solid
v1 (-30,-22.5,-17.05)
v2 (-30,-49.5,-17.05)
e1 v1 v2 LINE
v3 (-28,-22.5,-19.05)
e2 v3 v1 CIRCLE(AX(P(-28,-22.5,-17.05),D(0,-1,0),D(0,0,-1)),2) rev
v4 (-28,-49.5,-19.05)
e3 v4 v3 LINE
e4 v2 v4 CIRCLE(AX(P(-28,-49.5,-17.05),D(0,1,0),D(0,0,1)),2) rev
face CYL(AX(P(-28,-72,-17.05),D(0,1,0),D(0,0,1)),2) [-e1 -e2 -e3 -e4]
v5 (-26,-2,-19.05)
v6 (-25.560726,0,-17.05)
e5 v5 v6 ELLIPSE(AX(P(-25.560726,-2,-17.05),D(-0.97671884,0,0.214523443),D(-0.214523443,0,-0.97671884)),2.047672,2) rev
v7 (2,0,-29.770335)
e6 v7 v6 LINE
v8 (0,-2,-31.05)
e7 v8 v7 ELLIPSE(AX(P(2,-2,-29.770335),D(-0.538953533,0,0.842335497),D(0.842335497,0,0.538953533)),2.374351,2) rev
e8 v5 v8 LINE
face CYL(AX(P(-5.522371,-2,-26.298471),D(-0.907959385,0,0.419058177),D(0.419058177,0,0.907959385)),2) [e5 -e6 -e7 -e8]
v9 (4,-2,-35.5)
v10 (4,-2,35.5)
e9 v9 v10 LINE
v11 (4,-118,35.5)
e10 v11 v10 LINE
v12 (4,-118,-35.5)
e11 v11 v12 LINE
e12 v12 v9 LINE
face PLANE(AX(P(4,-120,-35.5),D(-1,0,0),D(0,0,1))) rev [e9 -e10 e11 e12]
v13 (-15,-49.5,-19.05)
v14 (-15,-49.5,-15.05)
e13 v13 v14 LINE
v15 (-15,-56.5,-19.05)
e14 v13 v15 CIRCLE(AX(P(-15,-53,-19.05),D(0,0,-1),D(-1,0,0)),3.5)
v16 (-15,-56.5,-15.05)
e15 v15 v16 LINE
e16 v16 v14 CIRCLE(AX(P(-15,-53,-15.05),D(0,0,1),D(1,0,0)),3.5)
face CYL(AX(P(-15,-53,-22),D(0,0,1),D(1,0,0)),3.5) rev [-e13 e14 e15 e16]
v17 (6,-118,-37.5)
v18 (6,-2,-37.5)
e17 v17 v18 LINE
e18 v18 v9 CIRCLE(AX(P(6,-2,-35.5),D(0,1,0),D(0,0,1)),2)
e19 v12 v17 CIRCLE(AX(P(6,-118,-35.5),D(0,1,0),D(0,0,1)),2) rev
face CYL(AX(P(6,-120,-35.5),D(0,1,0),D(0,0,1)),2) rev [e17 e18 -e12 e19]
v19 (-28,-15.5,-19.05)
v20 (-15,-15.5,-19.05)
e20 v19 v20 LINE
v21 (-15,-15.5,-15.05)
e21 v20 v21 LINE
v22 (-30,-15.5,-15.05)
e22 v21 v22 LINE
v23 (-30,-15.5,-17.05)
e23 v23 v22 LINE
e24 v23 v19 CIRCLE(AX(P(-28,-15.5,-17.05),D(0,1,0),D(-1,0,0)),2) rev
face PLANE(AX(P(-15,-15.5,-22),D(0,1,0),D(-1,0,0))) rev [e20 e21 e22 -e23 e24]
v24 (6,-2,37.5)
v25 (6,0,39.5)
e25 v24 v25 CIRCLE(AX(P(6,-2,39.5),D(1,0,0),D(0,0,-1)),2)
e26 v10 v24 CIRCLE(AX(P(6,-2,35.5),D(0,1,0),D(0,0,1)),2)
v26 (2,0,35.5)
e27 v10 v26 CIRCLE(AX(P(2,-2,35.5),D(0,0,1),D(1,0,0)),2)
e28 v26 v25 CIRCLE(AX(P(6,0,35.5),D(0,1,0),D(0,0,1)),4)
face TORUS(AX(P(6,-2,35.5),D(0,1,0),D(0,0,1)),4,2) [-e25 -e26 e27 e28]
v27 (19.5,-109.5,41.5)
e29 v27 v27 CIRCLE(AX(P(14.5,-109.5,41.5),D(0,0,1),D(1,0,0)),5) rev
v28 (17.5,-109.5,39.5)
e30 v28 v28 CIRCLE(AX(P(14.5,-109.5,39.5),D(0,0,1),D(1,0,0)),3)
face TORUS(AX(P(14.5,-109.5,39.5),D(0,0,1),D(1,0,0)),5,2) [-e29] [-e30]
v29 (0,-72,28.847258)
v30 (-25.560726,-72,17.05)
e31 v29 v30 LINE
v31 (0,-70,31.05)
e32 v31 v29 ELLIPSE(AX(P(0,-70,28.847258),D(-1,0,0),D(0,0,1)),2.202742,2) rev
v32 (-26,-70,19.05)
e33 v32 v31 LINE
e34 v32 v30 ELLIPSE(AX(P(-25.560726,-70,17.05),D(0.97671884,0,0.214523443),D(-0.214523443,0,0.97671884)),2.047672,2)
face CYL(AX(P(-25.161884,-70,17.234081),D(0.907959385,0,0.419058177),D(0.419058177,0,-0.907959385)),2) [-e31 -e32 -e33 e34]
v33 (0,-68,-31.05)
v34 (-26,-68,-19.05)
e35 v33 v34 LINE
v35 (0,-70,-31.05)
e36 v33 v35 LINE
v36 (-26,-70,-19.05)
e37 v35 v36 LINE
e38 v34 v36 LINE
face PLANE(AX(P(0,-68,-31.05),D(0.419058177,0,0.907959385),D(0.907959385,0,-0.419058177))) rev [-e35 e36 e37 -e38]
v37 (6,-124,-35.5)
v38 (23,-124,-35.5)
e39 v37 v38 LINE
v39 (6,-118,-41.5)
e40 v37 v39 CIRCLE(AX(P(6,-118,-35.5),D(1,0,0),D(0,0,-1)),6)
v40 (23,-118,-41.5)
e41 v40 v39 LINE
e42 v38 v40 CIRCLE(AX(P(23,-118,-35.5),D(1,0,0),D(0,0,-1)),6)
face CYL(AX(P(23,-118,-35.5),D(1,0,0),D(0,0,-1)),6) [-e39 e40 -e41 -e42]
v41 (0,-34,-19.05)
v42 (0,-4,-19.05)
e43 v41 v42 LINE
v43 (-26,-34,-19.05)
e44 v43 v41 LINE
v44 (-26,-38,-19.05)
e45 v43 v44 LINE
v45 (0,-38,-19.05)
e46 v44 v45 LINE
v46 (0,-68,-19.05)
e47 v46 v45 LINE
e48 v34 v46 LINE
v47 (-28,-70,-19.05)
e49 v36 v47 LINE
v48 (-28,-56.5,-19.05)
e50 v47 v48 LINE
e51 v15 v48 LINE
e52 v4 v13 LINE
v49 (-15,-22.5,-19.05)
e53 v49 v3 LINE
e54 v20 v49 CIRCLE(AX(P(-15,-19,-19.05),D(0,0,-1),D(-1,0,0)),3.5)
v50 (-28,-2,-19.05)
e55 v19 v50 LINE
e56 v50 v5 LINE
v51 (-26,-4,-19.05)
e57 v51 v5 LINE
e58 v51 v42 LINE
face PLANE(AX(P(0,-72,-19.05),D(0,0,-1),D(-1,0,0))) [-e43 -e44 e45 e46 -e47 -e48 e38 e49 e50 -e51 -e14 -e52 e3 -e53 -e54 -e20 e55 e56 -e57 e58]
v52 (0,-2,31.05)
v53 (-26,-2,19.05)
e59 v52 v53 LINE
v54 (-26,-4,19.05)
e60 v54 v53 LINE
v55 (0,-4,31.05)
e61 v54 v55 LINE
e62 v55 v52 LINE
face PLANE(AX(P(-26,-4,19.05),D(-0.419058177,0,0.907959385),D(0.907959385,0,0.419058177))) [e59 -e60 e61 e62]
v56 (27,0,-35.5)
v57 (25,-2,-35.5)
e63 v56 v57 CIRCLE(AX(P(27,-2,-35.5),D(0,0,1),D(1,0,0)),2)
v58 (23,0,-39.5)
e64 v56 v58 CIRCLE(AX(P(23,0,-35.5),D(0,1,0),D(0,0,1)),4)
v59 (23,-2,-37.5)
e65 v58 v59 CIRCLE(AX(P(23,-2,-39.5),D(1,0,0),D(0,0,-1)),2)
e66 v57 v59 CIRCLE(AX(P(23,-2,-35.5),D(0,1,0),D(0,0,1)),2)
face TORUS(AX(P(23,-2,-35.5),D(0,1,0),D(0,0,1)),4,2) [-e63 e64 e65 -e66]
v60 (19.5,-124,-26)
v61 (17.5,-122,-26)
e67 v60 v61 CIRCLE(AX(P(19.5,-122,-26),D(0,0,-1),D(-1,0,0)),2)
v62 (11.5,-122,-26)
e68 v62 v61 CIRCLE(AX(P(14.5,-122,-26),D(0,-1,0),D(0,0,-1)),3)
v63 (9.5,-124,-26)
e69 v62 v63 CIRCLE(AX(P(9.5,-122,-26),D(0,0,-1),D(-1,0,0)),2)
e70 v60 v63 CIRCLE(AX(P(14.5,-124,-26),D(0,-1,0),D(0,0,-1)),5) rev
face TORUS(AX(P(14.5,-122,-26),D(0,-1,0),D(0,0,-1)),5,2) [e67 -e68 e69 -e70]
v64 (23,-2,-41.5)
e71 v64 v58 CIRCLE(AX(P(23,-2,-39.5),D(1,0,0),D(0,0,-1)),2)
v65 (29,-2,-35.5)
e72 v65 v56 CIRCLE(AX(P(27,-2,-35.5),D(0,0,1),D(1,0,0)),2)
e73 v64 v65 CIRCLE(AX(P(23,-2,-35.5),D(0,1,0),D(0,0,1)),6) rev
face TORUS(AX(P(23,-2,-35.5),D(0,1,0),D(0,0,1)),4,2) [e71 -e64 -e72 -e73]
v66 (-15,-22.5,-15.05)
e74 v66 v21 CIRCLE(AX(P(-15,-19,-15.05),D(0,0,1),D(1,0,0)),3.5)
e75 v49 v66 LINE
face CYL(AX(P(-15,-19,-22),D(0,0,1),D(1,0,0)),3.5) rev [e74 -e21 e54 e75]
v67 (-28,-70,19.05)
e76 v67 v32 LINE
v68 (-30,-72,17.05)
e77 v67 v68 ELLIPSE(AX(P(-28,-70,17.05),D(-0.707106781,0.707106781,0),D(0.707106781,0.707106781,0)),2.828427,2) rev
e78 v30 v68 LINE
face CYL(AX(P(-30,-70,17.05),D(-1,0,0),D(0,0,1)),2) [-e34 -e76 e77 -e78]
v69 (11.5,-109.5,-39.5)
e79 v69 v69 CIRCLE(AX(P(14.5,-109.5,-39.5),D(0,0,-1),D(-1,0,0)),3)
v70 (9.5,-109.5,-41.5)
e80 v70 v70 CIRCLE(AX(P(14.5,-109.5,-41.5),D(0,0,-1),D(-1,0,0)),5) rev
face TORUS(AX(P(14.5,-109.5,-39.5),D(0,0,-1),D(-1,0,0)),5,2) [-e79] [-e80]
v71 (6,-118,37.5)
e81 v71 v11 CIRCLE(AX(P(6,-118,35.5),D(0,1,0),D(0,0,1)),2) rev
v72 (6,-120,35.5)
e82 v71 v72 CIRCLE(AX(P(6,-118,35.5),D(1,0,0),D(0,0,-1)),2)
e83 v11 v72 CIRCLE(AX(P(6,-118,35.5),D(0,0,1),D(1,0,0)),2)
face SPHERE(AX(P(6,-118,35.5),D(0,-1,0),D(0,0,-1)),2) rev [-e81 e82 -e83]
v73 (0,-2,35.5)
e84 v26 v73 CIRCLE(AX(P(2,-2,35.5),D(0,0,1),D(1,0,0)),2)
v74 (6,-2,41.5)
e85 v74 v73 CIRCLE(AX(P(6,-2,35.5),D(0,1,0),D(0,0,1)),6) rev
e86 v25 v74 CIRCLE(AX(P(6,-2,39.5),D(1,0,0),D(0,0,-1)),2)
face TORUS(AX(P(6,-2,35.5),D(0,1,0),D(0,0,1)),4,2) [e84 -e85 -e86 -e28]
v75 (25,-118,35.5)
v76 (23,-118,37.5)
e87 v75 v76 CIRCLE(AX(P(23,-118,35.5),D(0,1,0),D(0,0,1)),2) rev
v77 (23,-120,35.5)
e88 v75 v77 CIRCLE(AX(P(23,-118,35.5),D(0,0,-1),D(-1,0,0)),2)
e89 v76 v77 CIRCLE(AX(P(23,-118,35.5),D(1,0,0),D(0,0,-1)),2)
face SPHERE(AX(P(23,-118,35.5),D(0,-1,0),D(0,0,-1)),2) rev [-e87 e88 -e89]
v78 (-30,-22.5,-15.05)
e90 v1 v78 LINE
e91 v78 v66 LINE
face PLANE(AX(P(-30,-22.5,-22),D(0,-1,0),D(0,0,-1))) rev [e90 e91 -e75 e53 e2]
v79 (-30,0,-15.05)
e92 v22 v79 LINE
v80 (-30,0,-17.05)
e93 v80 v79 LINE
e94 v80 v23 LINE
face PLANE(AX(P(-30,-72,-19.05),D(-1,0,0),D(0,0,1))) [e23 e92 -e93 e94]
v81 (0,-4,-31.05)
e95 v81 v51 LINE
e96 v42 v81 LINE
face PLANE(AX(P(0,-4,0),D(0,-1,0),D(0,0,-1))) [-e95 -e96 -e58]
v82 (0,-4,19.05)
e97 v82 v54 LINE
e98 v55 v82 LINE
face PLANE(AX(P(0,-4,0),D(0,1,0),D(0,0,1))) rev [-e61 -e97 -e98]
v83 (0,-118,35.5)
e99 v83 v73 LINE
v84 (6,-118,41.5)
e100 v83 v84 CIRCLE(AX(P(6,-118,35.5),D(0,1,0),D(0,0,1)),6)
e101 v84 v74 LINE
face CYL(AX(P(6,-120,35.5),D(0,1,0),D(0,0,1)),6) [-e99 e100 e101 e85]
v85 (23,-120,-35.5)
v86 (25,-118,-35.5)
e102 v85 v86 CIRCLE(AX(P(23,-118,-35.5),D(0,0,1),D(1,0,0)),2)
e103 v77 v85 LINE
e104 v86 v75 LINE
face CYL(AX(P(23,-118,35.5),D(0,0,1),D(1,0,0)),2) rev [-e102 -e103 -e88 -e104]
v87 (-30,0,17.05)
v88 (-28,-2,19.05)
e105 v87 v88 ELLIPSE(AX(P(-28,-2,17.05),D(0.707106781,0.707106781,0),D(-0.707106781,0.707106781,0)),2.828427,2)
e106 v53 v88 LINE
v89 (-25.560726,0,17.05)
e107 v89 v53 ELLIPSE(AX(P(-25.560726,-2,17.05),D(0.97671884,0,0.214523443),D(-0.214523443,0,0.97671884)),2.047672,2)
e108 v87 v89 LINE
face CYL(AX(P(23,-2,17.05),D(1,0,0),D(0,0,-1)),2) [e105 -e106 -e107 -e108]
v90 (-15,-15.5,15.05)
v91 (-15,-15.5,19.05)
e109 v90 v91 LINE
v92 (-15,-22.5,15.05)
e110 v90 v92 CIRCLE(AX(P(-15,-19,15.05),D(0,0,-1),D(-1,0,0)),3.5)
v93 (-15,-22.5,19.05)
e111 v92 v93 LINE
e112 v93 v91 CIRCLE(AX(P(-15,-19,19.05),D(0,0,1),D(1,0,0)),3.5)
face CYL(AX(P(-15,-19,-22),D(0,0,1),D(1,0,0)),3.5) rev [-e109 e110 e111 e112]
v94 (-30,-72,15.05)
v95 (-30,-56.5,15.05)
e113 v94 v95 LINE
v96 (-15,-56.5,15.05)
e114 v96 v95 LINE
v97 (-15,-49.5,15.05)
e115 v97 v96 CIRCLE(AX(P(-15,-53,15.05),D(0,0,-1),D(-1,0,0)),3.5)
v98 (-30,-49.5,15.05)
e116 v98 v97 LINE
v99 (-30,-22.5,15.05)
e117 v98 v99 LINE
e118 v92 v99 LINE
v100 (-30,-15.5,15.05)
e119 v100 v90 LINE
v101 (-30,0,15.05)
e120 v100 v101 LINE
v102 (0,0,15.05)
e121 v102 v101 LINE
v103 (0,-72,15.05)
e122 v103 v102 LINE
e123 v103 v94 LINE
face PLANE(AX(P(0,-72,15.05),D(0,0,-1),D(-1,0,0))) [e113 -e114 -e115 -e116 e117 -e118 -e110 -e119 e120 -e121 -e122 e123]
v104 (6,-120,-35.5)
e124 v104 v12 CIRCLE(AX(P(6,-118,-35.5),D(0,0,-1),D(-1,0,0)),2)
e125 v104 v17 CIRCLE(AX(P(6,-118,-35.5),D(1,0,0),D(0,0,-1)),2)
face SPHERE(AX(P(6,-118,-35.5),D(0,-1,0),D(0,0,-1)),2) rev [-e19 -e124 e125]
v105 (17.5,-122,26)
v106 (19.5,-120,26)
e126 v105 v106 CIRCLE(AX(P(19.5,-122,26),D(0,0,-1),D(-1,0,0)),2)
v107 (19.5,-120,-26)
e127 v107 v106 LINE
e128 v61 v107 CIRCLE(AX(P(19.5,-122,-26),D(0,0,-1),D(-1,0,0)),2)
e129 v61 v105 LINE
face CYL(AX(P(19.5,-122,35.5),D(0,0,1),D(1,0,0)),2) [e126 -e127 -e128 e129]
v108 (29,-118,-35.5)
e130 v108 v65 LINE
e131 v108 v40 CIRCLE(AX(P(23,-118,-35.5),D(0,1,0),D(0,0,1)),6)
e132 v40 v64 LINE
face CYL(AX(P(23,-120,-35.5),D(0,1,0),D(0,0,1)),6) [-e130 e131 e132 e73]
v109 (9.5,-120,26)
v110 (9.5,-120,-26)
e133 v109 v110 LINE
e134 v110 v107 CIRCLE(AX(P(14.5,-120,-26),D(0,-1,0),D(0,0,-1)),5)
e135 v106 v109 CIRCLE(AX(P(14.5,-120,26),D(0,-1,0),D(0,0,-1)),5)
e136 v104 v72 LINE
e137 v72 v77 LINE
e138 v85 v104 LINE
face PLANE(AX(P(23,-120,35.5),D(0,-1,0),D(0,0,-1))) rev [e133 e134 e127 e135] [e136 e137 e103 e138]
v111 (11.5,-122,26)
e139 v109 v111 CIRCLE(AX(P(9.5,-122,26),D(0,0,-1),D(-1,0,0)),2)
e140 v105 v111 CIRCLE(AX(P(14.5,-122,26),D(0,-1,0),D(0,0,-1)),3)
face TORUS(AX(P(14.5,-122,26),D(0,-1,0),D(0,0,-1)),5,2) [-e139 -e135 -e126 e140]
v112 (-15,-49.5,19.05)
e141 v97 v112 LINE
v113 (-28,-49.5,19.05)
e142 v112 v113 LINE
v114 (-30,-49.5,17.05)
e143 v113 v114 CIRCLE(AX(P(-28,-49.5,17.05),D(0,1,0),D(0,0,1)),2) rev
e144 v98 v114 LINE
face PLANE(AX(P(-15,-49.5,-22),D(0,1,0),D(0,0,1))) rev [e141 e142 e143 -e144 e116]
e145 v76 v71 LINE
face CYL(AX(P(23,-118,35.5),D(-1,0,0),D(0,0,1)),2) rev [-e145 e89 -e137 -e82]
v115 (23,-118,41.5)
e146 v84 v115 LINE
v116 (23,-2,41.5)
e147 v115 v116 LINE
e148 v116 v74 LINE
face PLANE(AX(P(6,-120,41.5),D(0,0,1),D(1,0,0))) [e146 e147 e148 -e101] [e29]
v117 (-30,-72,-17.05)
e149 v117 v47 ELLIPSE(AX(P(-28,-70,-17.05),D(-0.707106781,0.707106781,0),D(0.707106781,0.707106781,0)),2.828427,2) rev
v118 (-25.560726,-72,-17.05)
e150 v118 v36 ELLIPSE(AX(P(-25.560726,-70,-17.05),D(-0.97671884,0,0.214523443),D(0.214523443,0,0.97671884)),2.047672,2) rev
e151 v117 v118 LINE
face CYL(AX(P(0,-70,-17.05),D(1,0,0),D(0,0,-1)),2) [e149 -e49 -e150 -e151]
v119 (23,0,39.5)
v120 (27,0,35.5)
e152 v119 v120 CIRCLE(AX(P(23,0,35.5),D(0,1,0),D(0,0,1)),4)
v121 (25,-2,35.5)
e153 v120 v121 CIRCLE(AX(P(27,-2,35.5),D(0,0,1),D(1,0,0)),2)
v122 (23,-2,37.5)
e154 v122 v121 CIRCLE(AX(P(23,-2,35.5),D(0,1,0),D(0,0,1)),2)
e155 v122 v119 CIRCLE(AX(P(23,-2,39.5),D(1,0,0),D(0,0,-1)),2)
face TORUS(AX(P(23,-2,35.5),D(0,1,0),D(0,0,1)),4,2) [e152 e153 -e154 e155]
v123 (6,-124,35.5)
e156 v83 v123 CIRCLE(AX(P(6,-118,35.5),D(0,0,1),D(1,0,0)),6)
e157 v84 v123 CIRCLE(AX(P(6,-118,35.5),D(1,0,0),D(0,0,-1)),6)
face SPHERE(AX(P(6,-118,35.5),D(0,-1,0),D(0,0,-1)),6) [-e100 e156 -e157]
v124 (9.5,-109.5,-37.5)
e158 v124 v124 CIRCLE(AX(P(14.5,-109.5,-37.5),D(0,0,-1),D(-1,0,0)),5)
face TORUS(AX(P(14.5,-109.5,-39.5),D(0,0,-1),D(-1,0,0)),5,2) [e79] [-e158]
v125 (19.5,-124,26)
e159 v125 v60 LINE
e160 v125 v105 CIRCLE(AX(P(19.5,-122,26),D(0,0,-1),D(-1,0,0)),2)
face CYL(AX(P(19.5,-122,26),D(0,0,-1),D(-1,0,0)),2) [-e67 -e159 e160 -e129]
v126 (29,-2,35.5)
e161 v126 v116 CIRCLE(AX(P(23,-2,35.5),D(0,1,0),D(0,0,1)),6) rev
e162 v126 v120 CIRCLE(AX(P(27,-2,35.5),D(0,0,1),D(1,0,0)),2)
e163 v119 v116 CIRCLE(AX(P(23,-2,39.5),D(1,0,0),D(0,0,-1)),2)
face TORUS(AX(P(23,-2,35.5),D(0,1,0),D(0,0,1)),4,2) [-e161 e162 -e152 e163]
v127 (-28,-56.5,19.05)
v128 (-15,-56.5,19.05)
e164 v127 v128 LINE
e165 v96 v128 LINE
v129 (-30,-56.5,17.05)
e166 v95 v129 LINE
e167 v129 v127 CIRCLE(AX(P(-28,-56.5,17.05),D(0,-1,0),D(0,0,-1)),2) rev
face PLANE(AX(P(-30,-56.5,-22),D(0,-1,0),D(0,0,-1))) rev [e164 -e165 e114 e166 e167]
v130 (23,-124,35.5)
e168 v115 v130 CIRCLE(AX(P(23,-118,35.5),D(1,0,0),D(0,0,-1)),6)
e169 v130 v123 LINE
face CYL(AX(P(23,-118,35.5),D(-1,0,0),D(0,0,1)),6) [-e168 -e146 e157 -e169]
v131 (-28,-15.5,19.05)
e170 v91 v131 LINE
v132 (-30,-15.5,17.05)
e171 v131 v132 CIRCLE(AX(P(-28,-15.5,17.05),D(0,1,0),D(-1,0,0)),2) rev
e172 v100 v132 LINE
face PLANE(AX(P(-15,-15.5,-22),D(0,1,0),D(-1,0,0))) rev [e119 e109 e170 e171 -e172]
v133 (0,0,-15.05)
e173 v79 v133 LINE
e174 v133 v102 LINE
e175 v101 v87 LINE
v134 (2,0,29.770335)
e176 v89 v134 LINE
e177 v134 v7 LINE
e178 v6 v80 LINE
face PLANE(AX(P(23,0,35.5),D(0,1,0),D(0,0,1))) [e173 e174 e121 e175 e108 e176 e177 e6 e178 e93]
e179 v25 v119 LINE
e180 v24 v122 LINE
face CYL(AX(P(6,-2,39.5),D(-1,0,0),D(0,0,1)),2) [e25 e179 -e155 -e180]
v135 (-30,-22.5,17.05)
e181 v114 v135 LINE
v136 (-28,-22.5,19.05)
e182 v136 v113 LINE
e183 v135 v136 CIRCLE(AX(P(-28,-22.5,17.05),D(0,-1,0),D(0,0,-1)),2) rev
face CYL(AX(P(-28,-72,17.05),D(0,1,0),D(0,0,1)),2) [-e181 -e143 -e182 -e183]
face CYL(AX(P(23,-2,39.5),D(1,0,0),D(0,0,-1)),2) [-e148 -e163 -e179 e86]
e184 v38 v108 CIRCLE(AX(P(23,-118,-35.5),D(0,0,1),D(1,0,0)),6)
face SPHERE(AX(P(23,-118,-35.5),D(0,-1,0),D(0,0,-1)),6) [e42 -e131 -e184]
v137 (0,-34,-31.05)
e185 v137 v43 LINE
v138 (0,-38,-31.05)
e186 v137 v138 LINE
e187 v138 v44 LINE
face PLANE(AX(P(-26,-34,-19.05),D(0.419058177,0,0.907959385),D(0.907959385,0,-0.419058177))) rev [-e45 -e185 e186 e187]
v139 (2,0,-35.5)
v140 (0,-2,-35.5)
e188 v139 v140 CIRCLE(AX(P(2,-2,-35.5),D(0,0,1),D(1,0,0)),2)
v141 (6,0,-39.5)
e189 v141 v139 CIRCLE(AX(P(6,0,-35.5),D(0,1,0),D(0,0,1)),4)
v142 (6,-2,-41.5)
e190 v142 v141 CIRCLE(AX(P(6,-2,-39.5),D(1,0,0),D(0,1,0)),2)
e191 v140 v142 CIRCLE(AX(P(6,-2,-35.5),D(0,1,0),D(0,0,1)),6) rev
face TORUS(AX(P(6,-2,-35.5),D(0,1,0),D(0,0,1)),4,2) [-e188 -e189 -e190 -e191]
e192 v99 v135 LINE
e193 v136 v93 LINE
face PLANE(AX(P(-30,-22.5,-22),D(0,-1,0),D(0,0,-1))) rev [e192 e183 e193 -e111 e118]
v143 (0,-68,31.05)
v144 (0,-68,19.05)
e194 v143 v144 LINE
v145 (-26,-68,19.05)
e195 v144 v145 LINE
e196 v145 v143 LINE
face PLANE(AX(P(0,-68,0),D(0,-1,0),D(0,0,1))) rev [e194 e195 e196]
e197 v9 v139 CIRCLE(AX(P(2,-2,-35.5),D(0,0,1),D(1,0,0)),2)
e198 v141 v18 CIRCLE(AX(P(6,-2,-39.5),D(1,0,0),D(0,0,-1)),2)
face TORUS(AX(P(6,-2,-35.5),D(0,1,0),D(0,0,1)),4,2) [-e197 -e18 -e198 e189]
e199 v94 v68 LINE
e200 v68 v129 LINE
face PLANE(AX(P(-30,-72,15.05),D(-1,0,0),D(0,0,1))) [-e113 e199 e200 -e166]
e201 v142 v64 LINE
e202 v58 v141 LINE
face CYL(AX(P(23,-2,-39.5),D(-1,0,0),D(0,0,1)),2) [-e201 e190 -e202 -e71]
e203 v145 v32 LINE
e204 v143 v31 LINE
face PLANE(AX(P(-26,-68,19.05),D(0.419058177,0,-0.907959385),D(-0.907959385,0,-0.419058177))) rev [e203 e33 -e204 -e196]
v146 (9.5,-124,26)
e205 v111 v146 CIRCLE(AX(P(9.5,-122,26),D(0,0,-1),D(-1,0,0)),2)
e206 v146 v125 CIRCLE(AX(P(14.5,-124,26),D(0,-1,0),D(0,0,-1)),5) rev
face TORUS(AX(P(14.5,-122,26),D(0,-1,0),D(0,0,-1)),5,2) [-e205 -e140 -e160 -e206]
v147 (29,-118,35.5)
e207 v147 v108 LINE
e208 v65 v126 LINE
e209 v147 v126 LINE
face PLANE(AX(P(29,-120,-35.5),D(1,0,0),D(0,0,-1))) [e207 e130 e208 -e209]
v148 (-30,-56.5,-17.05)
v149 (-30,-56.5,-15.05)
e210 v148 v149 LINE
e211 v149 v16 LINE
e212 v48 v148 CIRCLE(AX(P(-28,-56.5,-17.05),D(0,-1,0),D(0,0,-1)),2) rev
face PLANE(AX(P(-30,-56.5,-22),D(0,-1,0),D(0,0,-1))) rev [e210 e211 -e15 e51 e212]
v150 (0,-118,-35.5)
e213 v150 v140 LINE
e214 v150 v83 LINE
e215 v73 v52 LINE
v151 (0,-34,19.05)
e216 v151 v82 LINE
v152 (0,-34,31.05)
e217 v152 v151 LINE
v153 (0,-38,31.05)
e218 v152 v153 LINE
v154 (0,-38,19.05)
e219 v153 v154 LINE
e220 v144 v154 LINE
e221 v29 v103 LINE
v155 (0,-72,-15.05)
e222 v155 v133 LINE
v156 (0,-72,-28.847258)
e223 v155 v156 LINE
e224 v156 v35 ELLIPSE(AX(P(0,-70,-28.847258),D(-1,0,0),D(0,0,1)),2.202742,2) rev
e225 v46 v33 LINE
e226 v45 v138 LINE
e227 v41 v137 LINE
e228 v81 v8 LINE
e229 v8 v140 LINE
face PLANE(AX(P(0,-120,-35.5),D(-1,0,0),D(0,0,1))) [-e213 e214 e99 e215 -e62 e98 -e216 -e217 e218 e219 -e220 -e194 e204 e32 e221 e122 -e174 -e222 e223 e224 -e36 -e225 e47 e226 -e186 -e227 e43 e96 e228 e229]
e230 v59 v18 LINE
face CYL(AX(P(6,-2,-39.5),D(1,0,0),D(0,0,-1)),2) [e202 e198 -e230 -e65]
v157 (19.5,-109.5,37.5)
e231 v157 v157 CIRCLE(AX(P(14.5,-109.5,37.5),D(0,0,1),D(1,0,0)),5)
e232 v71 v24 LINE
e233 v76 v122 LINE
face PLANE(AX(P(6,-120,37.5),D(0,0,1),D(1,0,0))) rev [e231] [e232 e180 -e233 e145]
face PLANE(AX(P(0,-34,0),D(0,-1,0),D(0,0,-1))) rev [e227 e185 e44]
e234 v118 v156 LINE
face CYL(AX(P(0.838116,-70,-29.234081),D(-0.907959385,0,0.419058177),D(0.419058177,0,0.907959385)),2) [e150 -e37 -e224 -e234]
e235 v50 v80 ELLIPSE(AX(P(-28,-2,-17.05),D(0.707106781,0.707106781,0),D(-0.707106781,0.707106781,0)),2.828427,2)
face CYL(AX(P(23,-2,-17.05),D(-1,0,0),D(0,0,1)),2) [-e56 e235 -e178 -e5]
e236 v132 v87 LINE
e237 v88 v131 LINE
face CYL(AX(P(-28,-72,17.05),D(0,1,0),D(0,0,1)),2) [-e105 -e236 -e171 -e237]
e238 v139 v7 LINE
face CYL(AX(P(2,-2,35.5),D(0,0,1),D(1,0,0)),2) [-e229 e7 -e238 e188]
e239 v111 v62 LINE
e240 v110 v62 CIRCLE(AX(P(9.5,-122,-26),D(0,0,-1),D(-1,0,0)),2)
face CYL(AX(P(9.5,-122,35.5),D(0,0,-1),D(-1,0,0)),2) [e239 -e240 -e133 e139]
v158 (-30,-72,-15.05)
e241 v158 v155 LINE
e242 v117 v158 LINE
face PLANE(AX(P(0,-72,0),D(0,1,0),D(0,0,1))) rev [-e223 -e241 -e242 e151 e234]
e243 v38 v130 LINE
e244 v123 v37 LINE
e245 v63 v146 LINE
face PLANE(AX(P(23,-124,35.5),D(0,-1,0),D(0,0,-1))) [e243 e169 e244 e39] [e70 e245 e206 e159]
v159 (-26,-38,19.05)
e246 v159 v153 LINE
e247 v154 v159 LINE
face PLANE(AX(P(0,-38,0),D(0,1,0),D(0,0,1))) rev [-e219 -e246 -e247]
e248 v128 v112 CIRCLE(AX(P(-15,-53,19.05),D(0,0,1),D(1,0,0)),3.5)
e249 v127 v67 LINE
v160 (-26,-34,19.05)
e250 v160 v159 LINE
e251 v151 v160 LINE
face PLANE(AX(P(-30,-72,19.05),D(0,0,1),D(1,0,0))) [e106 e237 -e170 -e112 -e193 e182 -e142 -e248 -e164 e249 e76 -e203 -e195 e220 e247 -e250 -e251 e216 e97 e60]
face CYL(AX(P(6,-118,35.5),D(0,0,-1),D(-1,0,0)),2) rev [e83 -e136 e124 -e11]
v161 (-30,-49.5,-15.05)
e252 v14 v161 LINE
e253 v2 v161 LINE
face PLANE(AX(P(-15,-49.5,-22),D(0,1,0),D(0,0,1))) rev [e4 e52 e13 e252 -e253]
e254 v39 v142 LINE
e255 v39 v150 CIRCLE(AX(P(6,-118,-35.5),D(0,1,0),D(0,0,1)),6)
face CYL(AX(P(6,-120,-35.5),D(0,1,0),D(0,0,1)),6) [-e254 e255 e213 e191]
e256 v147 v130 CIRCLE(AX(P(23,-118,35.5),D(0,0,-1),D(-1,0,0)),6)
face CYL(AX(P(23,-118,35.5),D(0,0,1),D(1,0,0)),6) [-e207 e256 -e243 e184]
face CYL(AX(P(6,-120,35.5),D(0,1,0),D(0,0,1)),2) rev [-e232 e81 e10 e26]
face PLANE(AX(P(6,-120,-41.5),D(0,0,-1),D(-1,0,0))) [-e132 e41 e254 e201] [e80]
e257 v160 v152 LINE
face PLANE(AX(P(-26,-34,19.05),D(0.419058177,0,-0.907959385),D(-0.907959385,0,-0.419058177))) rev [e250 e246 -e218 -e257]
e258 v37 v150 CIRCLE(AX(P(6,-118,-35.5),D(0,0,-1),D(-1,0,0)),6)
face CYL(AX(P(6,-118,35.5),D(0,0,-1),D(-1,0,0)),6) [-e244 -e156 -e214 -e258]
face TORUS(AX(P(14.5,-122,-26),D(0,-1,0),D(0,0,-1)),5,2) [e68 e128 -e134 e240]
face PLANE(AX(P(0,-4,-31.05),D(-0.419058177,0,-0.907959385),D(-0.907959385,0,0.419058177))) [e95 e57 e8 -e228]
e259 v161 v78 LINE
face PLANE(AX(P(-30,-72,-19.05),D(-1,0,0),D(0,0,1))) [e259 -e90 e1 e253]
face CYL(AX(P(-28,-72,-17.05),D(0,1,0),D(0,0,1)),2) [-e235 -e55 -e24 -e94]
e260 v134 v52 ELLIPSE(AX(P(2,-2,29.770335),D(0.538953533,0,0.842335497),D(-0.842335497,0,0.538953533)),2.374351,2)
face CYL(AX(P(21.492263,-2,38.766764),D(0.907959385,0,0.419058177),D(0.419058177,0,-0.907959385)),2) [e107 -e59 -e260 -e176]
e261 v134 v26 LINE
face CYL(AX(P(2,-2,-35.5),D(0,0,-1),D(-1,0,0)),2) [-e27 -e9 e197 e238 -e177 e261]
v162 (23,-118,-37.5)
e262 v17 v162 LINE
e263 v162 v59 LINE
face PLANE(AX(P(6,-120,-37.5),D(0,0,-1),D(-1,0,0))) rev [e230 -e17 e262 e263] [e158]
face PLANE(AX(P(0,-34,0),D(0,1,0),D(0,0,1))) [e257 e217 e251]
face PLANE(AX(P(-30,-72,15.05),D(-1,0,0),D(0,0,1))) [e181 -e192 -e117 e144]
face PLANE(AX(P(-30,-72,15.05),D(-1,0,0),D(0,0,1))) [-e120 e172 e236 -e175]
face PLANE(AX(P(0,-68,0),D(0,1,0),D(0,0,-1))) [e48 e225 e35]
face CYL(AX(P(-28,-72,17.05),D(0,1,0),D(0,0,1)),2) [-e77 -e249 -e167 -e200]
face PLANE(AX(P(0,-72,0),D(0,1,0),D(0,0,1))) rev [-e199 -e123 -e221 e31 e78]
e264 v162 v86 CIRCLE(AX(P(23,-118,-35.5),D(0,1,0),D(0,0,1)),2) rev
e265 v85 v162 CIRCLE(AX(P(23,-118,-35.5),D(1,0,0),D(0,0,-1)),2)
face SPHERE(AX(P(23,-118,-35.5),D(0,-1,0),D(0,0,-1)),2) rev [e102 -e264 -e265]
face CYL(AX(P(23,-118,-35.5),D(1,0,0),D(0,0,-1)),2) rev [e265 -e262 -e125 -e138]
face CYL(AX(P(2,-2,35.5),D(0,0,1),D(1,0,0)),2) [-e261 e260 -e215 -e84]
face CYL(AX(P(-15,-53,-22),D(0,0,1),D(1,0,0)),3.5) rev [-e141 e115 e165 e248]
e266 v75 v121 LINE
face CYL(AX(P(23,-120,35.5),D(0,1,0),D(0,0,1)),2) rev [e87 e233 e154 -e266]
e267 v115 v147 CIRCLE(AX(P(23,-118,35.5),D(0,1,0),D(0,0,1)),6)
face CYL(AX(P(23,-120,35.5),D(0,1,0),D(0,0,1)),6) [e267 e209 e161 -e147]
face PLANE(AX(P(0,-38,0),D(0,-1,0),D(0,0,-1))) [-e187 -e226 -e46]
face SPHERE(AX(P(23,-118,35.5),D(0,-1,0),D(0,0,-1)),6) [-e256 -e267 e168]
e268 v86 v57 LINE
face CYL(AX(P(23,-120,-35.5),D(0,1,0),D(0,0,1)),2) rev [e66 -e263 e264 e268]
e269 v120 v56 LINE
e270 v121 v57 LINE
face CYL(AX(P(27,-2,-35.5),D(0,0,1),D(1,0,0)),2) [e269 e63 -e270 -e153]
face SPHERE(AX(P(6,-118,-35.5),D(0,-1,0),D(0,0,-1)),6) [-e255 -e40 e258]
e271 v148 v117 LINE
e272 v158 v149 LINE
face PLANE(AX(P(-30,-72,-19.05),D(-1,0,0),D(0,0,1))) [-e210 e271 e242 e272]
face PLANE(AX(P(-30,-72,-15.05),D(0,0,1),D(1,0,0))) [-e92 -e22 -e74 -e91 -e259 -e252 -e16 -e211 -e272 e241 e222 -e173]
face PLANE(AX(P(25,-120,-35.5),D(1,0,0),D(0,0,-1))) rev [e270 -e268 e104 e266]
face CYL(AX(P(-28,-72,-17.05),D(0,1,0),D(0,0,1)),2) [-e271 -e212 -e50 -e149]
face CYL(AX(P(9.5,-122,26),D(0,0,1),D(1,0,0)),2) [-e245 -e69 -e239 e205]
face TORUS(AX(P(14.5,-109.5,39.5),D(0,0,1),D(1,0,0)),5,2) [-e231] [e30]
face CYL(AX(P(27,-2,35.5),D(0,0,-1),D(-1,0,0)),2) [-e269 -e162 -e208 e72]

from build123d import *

# Parameters (mm, degrees)
EXTRUDE_1_DEPTH     = 120
EXTRUDE_2_DEPTH     = 4
FILLET_1_R          = 2
FILLET_2_R          = 6
SKETCH_3_W          = 30
SKETCH_3_H          = 4
EXTRUDE_3_DEPTH     = 72
EXTRUDE_4_DEPTH     = 2
EXTRUDE_5_DEPTH     = 4
CUT_EXTRUDE_1_DEPTH = 22
CUT_EXTRUDE_2_DEPTH = 4
SKETCH_8_R          = 3
CUT_EXTRUDE_3_DEPTH = 42
FILLET_3_R          = 2


with BuildPart() as part:
    # 스케치1 → 보스-돌출1 (new body)
    with BuildSketch(Plane(origin=(0, 0, 0), x_dir=(1, 0, 0), z_dir=(0, 1, 0))):
        with BuildLine():
            Line((6, 41.5), (23, 41.5))
            ThreePointArc((23, 41.5), (27.242640687, 39.742640687), (29, 35.5))
            Line((29, 35.5), (29, -35.5))
            ThreePointArc((29, -35.5), (27.242640687, -39.742640687), (23, -41.5))
            Line((23, -41.5), (6, -41.5))
            ThreePointArc((6, -41.5), (1.757359313, -39.742640687), (0, -35.5))
            Line((0, -35.5), (0, 35.5))
            ThreePointArc((0, 35.5), (1.757359313, 39.742640687), (6, 41.5))
        make_face()
        with BuildLine():
            Line((6, 37.5), (23, 37.5))
            ThreePointArc((23, 37.5), (24.414213562, 36.914213562), (25, 35.5))
            Line((25, 35.5), (25, -35.5))
            ThreePointArc((25, -35.5), (24.414213562, -36.914213562), (23, -37.5))
            Line((23, -37.5), (6, -37.5))
            ThreePointArc((6, -37.5), (4.585786438, -36.914213562), (4, -35.5))
            Line((4, -35.5), (4, 35.5))
            ThreePointArc((4, 35.5), (4.585786438, 36.914213562), (6, 37.5))
        make_face(mode=Mode.SUBTRACT)
    extrude(amount=-EXTRUDE_1_DEPTH)

    # 스케치2 → 보스-돌출2 (add)
    with BuildSketch(Plane.XZ.offset(120)):
        with BuildLine():
            Line((23, 41.5), (6, 41.5))
            ThreePointArc((6, 41.5), (1.757359313, 39.742640687), (0, 35.5))
            Line((0, 35.5), (0, -35.5))
            ThreePointArc((0, -35.5), (1.757359313, -39.742640687), (6, -41.5))
            Line((6, -41.5), (23, -41.5))
            ThreePointArc((23, -41.5), (27.242640687, -39.742640687), (29, -35.5))
            Line((29, -35.5), (29, 35.5))
            ThreePointArc((29, 35.5), (27.242640687, 39.742640687), (23, 41.5))
        make_face()
    extrude(amount=EXTRUDE_2_DEPTH)

    # 필렛1
    fillet_1_edges = [part.edges().sort_by_distance(p)[0] for p in [
        (24.414213562, -120, 36.914213562),
        (14.5, -120, 37.5),
        (4.585786438, -120, 36.914213562),
        (4, -120, 0),
        (4.585786438, -120, -36.914213562),
        (14.5, -120, -37.5),
        (24.414213562, -120, -36.914213562),
        (25, -120, 0),
    ]]
    fillet(fillet_1_edges, radius=FILLET_1_R)

    # 필렛2
    fillet_2_edges = [part.edges().sort_by_distance(p)[0] for p in [
        (27.242640687, -124, 39.742640687),
        (14.5, -124, 41.5),
        (1.757359313, -124, 39.742640687),
        (0, -124, 0),
        (1.757359313, -124, -39.742640687),
        (14.5, -124, -41.5),
        (27.242640687, -124, -39.742640687),
        (29, -124, 0),
    ]]
    fillet(fillet_2_edges, radius=FILLET_2_R)

    # 스케치3 → 보스-돌출3 (add)
    with BuildSketch(Plane(origin=(0, 0, 0), x_dir=(1, 0, 0), z_dir=(0, 1, 0))):
        with Locations((-15, 17.05)):
            Rectangle(SKETCH_3_W, SKETCH_3_H)
        with Locations((-15, -17.05)):
            Rectangle(SKETCH_3_W, SKETCH_3_H)
    extrude(amount=-EXTRUDE_3_DEPTH)

    # 스케치4 → 보스-돌출4 (add, symmetric)
    with BuildSketch(Plane(origin=(0, -36, 0), x_dir=(1, 0, 0), z_dir=(0, 1, 0))):
        Polygon((0, 31.05), (0, 19.05), (-26, 19.05), align=None)
        Polygon((0, -19.05), (-26, -19.05), (0, -31.05), align=None)
    extrude(amount=EXTRUDE_4_DEPTH, both=True)

    # 스케치5 → 보스-돌출5 (add)
    with BuildSketch(Plane(origin=(0, 0, 0), x_dir=(1, 0, 0), z_dir=(0, 1, 0))):
        Polygon((0, -31.05), (0, -19.05), (-26, -19.05), align=None)
        Polygon((0, 31.05), (-26, 19.05), (0, 19.05), align=None)
    extrude_5 = extrude(amount=-EXTRUDE_5_DEPTH)

    # 대칭 복사1: 보스-돌출5 across plane
    add(extrude_5.mirror(Plane.ZX.offset(-36)))

    # 스케치6 → 컷-돌출1 (cut, symmetric)
    with BuildSketch(Plane.XY):
        with BuildLine():
            Line((-15, -15.5), (-30, -15.5))
            Line((-30, -15.5), (-30, -22.5))
            Line((-30, -22.5), (-15, -22.5))
            ThreePointArc((-15, -22.5), (-11.5, -19), (-15, -15.5))
        make_face()
        with BuildLine():
            Line((-15, -49.5), (-30, -49.5))
            Line((-30, -49.5), (-30, -56.5))
            Line((-30, -56.5), (-15, -56.5))
            ThreePointArc((-15, -56.5), (-11.5, -53), (-15, -49.5))
        make_face()
    extrude(amount=CUT_EXTRUDE_1_DEPTH, both=True, mode=Mode.SUBTRACT)

    # 스케치7 → 컷-돌출2 (cut)
    with BuildSketch(Plane.XZ.offset(124)):
        with BuildLine():
            Line((17.5, 26), (17.5, -26))
            ThreePointArc((17.5, -26), (14.5, -29), (11.5, -26))
            Line((11.5, -26), (11.5, 26))
            ThreePointArc((11.5, 26), (14.5, 29), (17.5, 26))
        make_face()
    extrude(amount=-CUT_EXTRUDE_2_DEPTH, mode=Mode.SUBTRACT)

    # 스케치8 → 컷-돌출3 (cut, symmetric)
    with BuildSketch(Plane.XY):
        with Locations(Location((14.5, -109.5, 0), (0, 0, 180))):
            Circle(SKETCH_8_R)
    extrude(amount=CUT_EXTRUDE_3_DEPTH, both=True, mode=Mode.SUBTRACT)

    # 필렛3
    fillet_3_edges = [part.edges().sort_by_distance(p)[0] for p in [
        (24.414213562, 0, 36.914213562),
        (14.5, 0, 37.5),
        (4.585786438, 0, 36.914213562),
        (4, 0, 0),
        (4.585786438, 0, -36.914213562),
        (14.5, 0, -37.5),
        (24.414213562, 0, -36.914213562),
        (0, 0, 33.275),
        (1.757359313, 0, 39.742640687),
        (14.5, 0, 41.5),
        (27.242640687, 0, 39.742640687),
        (29, 0, 0),
        (27.242640687, 0, -39.742640687),
        (14.5, 0, -41.5),
        (1.757359313, 0, -39.742640687),
        (25, 0, 0),
        (0, 0, -33.275),
        (-13, -72, 25.05),
        (-28, -72, 19.05),
        (-13, -72, -25.05),
        (-28, -72, -19.05),
        (-13, 0, 25.05),
        (-28, 0, 19.05),
        (-28, 0, -19.05),
        (-13, 0, -25.05),
        (-30, -7.75, -19.05),
        (-30, -36, -19.05),
        (-30, -64.25, -19.05),
        (-30, -64.25, 19.05),
        (-30, -36, 19.05),
        (-30, -7.75, 19.05),
        (14.5, -120, -29),
        (11.5, -120, 0),
        (14.5, -120, 29),
        (14.5, -124, -29),
        (11.5, -124, 0),
        (14.5, -124, 29),
        (17.5, -120, 0),
        (17.5, -124, 0),
        (17.5, -109.5, -37.5),
        (17.5, -109.5, -41.5),
        (17.5, -109.5, 37.5),
        (17.5, -109.5, 41.5),
    ]]
    fillet(fillet_3_edges, radius=FILLET_3_R - 0.0001)  # a hair under: the kernel refuses the full size


solid = part.part
